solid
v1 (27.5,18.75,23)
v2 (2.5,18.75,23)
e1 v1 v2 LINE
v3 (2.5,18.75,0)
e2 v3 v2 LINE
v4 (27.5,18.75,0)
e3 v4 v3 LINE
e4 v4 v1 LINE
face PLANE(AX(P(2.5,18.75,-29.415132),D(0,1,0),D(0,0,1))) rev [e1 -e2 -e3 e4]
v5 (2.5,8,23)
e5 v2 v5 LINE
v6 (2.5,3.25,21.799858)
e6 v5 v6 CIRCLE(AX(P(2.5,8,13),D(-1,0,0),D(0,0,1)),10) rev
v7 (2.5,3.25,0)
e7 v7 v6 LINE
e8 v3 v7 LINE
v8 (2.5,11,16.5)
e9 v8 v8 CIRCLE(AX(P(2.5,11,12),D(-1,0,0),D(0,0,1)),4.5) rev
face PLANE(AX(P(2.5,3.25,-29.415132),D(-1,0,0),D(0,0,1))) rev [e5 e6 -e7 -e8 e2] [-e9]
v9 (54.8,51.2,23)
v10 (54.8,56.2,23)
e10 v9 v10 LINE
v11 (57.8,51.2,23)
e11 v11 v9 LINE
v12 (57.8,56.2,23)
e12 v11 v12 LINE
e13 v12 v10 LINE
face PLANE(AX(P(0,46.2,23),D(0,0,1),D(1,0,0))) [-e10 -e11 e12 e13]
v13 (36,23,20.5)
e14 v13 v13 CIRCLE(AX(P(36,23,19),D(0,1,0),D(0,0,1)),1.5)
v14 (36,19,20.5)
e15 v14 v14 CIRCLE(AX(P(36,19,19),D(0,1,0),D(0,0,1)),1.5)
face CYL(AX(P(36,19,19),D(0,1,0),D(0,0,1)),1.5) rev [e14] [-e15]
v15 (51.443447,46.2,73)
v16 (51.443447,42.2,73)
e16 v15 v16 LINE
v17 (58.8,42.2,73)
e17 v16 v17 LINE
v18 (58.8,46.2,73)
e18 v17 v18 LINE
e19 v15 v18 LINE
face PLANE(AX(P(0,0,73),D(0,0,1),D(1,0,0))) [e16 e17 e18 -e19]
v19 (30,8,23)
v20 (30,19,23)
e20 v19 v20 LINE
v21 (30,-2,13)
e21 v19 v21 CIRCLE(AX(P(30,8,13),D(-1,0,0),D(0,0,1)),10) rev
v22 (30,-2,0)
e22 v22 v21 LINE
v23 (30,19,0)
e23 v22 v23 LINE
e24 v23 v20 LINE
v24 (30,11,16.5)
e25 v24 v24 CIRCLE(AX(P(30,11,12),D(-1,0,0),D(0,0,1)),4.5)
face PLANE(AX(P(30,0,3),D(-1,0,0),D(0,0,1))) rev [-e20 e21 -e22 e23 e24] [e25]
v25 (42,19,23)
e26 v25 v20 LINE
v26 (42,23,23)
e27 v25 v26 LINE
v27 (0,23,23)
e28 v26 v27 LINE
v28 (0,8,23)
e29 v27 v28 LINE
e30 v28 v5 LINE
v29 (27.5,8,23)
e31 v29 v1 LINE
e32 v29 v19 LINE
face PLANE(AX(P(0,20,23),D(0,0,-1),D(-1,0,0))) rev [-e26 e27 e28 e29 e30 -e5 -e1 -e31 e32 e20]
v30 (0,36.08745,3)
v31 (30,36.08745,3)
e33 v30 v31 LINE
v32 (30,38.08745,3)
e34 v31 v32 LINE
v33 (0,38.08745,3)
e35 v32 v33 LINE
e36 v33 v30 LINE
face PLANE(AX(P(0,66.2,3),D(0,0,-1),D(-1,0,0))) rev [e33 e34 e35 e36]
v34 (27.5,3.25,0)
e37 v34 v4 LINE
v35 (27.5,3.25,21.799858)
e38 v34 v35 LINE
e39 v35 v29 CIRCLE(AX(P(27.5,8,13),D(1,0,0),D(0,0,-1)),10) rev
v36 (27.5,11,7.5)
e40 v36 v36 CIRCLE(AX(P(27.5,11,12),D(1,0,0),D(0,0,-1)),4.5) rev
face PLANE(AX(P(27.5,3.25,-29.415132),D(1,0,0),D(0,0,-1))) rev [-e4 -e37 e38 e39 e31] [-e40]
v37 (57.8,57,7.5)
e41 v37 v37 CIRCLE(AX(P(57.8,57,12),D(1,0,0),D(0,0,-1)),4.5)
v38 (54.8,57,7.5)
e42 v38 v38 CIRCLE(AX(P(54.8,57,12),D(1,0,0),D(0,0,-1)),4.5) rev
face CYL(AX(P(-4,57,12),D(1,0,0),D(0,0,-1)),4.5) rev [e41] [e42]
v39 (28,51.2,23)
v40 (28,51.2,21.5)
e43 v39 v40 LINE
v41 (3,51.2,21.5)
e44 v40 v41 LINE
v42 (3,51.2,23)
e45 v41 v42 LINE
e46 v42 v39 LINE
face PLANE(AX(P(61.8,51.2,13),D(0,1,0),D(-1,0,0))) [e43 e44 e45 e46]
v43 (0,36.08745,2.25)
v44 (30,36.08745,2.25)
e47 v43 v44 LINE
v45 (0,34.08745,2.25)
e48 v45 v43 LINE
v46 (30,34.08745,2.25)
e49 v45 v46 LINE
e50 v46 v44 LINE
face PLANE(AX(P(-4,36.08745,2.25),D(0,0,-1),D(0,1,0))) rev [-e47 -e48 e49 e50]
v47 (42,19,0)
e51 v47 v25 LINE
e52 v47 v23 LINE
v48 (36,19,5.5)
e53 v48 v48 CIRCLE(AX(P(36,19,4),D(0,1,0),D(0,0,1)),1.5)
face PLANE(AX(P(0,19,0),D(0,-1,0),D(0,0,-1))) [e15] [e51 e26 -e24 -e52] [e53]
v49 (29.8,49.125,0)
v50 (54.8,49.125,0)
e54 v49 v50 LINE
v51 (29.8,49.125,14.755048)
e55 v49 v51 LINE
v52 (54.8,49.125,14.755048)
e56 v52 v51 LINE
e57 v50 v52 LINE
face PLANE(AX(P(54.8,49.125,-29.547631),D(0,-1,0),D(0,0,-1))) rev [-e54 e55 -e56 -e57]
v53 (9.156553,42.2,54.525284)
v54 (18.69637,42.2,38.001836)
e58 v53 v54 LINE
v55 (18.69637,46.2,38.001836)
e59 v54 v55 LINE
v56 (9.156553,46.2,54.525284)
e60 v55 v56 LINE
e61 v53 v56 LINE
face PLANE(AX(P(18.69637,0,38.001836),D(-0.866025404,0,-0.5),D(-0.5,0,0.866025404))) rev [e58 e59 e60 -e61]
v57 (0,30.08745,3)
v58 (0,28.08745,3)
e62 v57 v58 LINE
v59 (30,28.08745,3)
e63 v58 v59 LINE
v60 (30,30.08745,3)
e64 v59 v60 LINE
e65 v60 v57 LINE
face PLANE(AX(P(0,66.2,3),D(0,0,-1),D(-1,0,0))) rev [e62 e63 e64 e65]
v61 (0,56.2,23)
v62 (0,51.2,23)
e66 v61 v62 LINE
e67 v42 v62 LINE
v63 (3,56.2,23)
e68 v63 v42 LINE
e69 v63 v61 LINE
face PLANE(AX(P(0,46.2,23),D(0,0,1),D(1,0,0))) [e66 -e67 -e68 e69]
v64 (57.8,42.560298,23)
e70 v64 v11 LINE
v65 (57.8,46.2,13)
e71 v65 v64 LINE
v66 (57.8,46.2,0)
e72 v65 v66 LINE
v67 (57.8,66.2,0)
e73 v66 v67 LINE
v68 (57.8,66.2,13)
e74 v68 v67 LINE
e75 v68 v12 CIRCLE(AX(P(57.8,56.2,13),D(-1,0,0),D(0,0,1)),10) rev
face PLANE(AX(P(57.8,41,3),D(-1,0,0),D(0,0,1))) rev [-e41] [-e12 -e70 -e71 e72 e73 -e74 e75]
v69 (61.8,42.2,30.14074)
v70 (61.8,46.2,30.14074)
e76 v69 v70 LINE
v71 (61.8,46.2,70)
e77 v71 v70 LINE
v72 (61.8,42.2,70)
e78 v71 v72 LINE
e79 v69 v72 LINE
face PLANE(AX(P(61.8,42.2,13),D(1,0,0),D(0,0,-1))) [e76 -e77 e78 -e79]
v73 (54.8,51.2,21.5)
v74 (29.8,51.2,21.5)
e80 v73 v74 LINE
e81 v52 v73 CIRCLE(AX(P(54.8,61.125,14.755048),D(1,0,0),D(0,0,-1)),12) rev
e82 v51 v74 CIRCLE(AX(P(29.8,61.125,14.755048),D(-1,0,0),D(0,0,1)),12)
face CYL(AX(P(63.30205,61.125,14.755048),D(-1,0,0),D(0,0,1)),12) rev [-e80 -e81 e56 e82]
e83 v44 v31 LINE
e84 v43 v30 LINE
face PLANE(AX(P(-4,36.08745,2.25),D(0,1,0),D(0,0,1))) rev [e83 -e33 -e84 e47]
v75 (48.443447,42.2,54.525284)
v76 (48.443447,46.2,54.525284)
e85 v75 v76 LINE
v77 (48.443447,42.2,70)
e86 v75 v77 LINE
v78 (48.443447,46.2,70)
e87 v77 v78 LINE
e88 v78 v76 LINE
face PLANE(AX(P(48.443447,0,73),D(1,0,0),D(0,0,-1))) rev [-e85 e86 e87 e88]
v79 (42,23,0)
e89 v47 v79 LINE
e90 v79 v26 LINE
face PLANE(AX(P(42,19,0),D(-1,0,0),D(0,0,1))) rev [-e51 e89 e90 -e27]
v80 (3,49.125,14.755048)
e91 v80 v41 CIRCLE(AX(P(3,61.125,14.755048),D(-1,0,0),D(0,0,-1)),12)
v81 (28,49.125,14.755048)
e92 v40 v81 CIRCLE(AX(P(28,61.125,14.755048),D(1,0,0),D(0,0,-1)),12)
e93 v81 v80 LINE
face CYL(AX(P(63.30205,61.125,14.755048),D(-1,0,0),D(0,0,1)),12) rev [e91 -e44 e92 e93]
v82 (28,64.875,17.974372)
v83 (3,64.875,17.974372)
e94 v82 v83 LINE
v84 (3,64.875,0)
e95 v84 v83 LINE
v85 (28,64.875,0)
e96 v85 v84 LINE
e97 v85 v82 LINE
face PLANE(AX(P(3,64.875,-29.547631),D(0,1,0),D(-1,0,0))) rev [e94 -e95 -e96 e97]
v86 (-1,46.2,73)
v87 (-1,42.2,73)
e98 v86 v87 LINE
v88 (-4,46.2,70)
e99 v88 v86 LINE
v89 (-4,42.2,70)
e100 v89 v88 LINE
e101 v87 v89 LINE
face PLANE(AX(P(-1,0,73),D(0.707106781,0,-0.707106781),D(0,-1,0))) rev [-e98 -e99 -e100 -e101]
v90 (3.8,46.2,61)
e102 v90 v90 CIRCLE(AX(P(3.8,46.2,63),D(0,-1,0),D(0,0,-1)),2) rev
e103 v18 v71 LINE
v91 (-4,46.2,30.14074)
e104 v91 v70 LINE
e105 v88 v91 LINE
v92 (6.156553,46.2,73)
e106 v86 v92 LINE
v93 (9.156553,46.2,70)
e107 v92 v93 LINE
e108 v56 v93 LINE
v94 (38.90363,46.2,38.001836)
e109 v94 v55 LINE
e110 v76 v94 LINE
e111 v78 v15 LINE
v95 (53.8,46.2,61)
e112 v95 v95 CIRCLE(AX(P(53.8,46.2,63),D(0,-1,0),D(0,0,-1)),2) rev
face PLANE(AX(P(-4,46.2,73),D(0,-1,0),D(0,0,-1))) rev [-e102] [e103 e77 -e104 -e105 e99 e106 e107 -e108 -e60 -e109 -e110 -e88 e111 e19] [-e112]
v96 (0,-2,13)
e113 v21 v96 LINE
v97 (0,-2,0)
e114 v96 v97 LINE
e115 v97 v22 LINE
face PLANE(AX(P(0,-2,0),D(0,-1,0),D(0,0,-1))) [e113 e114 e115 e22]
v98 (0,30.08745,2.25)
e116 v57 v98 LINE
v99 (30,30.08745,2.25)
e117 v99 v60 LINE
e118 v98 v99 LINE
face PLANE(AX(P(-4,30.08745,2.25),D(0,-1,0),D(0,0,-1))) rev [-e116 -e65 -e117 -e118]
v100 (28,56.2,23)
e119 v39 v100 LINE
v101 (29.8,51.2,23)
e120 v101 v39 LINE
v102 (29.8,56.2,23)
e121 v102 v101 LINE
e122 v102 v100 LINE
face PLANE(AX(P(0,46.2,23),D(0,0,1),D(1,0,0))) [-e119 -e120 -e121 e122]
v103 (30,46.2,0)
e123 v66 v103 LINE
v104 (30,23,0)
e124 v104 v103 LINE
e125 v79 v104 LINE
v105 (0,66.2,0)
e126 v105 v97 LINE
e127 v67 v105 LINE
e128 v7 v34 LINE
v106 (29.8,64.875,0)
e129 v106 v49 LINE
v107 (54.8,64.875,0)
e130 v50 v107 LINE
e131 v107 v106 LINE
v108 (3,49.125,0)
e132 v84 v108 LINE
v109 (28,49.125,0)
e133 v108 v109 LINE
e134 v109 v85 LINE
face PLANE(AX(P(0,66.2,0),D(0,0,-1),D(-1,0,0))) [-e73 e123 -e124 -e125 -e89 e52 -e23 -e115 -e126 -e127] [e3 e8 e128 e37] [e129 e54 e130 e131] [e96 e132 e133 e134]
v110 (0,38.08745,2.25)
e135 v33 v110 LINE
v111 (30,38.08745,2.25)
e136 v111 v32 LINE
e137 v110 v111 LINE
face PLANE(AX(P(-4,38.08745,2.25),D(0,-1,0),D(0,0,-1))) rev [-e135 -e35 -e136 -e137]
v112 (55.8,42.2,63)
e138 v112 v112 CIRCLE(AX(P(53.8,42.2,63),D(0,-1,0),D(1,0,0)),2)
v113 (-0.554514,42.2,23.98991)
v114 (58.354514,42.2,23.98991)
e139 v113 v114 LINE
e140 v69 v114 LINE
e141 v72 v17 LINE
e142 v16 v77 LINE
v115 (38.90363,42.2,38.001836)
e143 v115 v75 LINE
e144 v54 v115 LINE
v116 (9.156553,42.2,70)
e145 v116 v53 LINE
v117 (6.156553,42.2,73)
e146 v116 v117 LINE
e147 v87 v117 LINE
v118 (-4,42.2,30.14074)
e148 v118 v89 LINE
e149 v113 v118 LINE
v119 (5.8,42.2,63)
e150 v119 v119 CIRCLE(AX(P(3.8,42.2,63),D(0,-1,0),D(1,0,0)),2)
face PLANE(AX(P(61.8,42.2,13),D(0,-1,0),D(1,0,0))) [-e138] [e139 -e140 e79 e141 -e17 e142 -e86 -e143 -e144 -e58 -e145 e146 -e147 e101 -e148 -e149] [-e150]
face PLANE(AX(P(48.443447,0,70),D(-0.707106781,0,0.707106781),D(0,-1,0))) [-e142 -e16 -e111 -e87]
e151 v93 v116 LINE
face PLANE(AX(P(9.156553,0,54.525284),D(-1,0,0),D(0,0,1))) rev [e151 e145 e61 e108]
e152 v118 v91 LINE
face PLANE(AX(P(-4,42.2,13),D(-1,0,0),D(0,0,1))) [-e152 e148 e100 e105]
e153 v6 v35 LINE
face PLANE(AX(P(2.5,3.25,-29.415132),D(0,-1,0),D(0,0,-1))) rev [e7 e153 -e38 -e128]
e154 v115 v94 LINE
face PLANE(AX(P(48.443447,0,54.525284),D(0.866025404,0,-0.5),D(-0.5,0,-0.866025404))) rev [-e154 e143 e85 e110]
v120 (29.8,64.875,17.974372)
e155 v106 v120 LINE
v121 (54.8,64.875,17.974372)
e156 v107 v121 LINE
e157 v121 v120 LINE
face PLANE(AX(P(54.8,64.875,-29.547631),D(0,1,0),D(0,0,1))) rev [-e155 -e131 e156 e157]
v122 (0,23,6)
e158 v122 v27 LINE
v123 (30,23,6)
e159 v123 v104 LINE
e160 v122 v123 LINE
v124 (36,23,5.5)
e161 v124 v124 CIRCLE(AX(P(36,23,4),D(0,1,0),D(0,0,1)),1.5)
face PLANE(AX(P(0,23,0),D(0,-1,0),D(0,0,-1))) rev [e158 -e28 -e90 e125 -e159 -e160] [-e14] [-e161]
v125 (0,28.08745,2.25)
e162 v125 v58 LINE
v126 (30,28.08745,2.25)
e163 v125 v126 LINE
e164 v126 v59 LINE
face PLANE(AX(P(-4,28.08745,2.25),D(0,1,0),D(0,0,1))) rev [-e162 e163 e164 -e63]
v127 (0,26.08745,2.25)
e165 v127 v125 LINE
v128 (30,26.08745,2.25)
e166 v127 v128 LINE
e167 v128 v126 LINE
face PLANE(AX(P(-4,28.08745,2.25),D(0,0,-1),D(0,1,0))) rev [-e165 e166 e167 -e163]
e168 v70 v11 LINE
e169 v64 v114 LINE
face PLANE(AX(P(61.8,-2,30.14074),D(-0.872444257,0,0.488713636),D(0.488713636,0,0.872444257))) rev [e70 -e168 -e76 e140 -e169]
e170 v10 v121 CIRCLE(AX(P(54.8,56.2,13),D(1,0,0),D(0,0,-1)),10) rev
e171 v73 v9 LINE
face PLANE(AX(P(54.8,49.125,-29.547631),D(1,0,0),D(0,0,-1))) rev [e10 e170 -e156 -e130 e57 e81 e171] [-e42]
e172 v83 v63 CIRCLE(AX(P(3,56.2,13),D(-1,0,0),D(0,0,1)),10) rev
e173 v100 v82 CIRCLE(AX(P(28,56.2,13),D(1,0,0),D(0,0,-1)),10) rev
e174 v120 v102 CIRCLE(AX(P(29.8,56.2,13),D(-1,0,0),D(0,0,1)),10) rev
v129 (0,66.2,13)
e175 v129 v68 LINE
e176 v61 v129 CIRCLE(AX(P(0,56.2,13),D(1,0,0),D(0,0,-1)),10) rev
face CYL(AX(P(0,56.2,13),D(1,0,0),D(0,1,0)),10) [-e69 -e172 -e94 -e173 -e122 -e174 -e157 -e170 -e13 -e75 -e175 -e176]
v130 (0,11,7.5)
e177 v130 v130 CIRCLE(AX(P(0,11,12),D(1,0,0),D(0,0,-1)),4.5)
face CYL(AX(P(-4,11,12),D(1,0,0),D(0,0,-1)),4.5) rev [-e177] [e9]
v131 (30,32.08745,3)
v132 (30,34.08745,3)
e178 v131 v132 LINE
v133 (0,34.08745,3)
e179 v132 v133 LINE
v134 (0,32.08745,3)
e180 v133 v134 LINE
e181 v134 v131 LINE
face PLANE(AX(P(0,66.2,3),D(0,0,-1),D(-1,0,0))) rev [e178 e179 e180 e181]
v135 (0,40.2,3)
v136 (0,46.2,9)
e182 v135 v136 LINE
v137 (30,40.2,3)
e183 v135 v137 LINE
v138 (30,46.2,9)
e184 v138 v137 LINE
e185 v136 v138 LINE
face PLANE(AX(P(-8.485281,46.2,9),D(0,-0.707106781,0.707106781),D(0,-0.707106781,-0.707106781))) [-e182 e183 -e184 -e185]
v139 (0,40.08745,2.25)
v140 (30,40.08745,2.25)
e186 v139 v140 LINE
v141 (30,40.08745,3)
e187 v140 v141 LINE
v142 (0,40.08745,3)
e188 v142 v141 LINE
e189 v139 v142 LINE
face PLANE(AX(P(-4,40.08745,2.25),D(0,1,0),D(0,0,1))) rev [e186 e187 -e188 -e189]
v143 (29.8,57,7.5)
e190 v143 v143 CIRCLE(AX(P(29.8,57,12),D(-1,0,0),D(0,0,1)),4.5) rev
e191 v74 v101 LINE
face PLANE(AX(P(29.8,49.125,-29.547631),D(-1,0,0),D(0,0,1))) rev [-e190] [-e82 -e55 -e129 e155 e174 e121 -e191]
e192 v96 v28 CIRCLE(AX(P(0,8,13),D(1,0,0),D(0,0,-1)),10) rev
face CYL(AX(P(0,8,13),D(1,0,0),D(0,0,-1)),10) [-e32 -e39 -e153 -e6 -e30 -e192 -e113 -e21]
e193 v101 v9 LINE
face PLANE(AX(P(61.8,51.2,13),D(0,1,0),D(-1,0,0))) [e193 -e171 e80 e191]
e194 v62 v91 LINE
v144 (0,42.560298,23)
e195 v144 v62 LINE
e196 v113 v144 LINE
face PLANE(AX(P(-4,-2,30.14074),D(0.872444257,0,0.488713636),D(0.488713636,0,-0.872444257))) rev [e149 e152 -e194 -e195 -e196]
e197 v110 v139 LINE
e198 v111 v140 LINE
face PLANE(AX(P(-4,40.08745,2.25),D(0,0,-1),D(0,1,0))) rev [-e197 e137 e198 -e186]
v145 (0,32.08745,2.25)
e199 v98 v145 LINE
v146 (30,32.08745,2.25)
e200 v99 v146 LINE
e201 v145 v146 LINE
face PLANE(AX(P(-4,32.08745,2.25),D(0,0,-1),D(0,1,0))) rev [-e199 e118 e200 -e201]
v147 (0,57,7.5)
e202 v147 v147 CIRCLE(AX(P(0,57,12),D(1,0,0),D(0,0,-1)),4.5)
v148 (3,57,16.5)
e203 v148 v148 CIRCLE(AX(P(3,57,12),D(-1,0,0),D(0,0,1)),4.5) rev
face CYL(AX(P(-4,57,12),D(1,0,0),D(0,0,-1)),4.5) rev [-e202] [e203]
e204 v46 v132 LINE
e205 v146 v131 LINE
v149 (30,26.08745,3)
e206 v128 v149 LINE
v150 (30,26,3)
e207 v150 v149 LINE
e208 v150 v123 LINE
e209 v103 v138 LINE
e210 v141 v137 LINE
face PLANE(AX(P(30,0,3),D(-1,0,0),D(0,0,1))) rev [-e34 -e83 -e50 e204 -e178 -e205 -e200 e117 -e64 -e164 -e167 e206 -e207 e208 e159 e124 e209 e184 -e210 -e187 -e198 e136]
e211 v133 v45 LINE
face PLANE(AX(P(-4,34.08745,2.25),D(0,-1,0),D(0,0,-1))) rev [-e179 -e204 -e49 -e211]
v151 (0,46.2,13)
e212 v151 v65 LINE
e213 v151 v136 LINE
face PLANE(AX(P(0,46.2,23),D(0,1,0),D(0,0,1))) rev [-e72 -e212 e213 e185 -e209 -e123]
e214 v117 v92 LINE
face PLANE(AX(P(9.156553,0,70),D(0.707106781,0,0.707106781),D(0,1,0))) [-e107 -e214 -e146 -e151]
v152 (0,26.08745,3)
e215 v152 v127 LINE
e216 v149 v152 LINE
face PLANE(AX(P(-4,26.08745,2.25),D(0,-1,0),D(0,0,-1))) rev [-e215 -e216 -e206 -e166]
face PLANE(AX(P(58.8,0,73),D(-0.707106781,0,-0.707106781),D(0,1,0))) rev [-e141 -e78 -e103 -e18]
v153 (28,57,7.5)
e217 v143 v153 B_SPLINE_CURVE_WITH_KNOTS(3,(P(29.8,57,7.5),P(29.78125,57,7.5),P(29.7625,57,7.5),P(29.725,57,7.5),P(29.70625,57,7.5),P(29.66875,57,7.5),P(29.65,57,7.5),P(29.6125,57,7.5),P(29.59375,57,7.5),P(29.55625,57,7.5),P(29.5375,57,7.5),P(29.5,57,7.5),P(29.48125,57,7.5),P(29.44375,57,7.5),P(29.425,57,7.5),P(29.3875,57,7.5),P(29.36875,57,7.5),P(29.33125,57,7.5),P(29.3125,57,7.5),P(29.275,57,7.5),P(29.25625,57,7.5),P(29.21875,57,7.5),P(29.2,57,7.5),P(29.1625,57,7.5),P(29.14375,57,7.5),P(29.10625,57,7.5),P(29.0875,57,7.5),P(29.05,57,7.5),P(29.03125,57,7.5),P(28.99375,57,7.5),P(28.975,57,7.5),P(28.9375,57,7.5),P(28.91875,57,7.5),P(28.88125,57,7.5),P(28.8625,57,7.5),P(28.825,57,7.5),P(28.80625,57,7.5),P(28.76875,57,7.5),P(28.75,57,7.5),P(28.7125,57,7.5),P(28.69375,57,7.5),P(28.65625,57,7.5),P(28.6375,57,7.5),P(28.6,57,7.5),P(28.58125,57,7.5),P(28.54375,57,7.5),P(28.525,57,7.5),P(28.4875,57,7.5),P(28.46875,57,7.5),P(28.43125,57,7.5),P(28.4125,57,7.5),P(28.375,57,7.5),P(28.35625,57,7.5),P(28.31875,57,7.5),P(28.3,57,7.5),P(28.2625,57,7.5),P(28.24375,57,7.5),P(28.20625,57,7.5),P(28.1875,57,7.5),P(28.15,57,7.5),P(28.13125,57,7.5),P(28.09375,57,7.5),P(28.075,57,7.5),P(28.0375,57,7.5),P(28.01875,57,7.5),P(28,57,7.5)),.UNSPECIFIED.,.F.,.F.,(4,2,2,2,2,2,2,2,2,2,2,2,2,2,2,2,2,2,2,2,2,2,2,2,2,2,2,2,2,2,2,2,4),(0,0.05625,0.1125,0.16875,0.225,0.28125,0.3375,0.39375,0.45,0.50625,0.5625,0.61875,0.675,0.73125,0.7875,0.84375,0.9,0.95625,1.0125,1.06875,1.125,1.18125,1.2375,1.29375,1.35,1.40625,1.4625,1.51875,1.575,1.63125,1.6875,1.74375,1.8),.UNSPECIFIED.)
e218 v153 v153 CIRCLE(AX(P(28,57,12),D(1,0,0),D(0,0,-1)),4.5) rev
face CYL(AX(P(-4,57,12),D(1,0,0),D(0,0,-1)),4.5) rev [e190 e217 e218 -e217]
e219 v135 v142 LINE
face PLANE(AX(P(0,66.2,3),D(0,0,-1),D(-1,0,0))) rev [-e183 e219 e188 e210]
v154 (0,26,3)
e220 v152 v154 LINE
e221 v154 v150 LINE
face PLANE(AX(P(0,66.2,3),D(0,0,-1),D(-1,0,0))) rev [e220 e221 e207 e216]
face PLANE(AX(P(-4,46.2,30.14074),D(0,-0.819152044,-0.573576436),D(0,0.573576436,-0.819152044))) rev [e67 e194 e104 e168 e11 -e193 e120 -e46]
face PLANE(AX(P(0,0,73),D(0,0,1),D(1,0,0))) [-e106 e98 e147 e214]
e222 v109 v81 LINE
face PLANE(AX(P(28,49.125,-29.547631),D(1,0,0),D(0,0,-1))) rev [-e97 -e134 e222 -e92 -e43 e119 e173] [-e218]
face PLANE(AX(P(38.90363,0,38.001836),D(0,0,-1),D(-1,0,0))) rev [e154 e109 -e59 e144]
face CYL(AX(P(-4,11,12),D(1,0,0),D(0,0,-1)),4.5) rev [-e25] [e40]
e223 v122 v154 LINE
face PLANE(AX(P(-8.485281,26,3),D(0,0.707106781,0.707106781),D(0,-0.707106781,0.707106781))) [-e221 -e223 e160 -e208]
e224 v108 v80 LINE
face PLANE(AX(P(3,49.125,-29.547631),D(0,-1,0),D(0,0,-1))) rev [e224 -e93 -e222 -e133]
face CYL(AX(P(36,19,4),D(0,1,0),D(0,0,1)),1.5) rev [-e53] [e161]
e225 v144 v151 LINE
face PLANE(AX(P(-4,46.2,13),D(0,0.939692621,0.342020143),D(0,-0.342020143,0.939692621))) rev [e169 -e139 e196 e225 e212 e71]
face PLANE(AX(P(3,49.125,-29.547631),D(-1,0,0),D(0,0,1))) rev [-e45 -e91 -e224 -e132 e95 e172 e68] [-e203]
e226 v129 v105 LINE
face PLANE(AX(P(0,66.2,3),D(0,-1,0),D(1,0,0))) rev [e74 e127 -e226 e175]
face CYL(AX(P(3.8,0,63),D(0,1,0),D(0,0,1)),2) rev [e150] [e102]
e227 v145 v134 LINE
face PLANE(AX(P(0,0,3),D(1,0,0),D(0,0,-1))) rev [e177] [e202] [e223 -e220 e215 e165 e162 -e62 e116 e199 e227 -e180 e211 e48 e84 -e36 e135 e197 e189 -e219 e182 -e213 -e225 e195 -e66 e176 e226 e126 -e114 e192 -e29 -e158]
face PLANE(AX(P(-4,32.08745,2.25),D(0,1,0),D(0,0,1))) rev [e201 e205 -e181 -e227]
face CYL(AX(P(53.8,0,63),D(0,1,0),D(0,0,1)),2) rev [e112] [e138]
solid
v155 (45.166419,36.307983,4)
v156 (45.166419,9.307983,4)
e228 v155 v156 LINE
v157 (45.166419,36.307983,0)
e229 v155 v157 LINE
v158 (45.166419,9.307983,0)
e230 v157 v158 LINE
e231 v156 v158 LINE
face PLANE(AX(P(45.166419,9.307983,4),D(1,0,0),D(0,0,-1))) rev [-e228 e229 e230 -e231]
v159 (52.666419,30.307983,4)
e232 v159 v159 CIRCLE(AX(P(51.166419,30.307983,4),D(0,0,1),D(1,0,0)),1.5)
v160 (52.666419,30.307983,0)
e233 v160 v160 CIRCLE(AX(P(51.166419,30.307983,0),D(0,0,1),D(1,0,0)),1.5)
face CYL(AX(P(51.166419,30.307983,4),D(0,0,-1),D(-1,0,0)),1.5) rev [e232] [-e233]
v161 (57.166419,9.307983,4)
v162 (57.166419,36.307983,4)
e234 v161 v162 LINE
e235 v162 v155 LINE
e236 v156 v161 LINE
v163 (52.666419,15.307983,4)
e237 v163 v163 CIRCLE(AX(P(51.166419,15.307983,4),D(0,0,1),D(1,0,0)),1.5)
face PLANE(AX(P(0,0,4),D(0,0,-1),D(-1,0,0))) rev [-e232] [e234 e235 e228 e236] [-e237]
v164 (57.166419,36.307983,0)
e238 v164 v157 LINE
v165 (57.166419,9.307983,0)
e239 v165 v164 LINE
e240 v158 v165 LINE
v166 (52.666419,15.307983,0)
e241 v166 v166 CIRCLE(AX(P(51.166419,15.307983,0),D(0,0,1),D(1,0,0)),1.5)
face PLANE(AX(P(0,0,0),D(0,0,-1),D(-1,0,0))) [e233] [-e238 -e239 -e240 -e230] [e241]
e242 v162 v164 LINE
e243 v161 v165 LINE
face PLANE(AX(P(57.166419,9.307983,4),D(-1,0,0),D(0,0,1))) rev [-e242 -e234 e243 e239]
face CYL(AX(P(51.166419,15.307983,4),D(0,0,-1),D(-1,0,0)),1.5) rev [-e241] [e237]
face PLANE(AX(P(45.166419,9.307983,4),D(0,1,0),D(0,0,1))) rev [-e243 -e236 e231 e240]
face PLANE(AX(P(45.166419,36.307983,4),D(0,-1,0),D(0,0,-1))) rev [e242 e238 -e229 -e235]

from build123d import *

# Parameters (mm, degrees)
SALIENTE_EXTRUIR3_DEPTH       = 3
CROQUIS6_W                    = 30
CROQUIS6_H                    = 20
CROQUIS6_W_2                  = 57.8
SALIENTE_EXTRUIR4_DEPTH       = 20
SALIENTE_EXTRUIR9_DEPTH       = 50
SALIENTE_EXTRUIR9_DEPTH_BACK  = 10
CROQUIS22_W                   = 65.8
CROQUIS22_H                   = 9
CROQUIS9_R                    = 4.5
CORTAR_EXTRUIR1_DEPTH         = 117.32145116
CROQUIS17_W                   = 25
CROQUIS17_H                   = 15.5
CORTAR_EXTRUIR6_DEPTH         = 23
CROQUIS18_W                   = 25
CROQUIS18_H                   = 15.75
CORTAR_EXTRUIR7_DEPTH         = 23
CROQUIS14_R                   = 2
CORTAR_EXTRUIR4_DEPTH         = 117.32145116
CROQUIS16_W                   = 3.75
CROQUIS16_H                   = 2
CORTAR_EXTRUIR5_DEPTH         = 105.247014346
SALIENTE_EXTRUIR10_DEPTH      = 51.8
CROQUIS24_W                   = 13.9
CROQUIS24_H                   = 5.2
CROQUIS24_W_2                 = 27.8
CORTAR_EXTRUIR9_DEPTH         = 115.462570301
REDONDEO1_R                   = 10
SALIENTE_EXTRUIR12_DEPTH      = 30
CROQUIS29_W                   = 30
CROQUIS29_H                   = 23
SALIENTE_EXTRUIR13_DEPTH      = 2
REDONDEO2_R                   = 10
CORTAR_EXTRUIR10_DEPTH        = 119.495063188
CHAFL_N1_SIZE                 = 3
CORTAR_EXTRUIR11_DEPTH        = 110.446242512
SALIENTE_EXTRUIR14_DEPTH      = 3
SALIENTE_EXTRUIR14_DEPTH_BACK = 1
CROQUIS12_R                   = 1.5
CROQUIS33_W                   = 12
CROQUIS33_H                   = 27
CROQUIS33_R                   = 1.5
SALIENTE_EXTRUIR15_DEPTH      = 4


with BuildPart() as part:
    # Croquis2 → Saliente-Extruir3 (new body)
    with BuildSketch(Plane.XY):
        Polygon((30, 41), (57.8, 41), (57.8, 66.2), (0, 66.2), (0, 0), (30, 0), align=None)
    extrude(amount=SALIENTE_EXTRUIR3_DEPTH)

    # Croquis6 → Saliente-Extruir4 (add)
    with BuildSketch(Plane.XY.offset(3)):
        with Locations((15, 10)):
            Rectangle(CROQUIS6_W, CROQUIS6_H)
        with Locations((28.9, 56.2)):
            Rectangle(CROQUIS6_W_2, CROQUIS6_H)
    extrude(amount=SALIENTE_EXTRUIR4_DEPTH)

    # Croquis22 → Saliente-Extruir9 (add, two sides: drawn at the far end of the back side and taken through both)
    with BuildSketch(Plane.XY.offset(23).offset(-SALIENTE_EXTRUIR9_DEPTH_BACK)):
        with Locations((28.9, 46.7)):
            Rectangle(CROQUIS22_W, CROQUIS22_H)
    extrude(amount=SALIENTE_EXTRUIR9_DEPTH + SALIENTE_EXTRUIR9_DEPTH_BACK)

    # Croquis9 → Cortar-Extruir1 (cut, through all)
    with BuildSketch(Plane(origin=(57.8, 0, 0), x_dir=(0, 0, -1), z_dir=(1, 0, 0))):
        with Locations((-12, 57)):
            Circle(CROQUIS9_R)
        with Locations((-12, 11)):
            Circle(CROQUIS9_R)
    extrude(amount=-CORTAR_EXTRUIR1_DEPTH, mode=Mode.SUBTRACT)

    # Croquis17 → Cortar-Extruir6 (cut)
    with BuildSketch(Plane.XY.offset(23)):
        with Locations((15, 11)):
            Rectangle(CROQUIS17_W, CROQUIS17_H)
    extrude(amount=-CORTAR_EXTRUIR6_DEPTH, mode=Mode.SUBTRACT)

    # Croquis18 → Cortar-Extruir7 (cut)
    with BuildSketch(Plane.XY.offset(23)):
        with Locations((15.5, 57)):
            Rectangle(CROQUIS18_W, CROQUIS18_H)
        with Locations((42.3, 57)):
            Rectangle(CROQUIS18_W, CROQUIS18_H)
    extrude(amount=-CORTAR_EXTRUIR7_DEPTH, mode=Mode.SUBTRACT)

    # Croquis14 → Cortar-Extruir4 (cut, through all)
    with BuildSketch(Plane(origin=(0, 66.2, 0), x_dir=(1, 0, 0), z_dir=(0, 1, 0))):
        with Locations(Location((3.8, -63, 0), (0, 0, 180))):
            Circle(CROQUIS14_R)
        with Locations(Location((53.8, -63, 0), (0, 0, 180))):
            Circle(CROQUIS14_R)
        Polygon((9.156552599, -54.525284491), (9.156552599, -73), (48.443447401, -73), (48.443447401, -54.525284491), (38.903629711, -38.001835556), (18.696370289, -38.001835556), align=None)
    extrude(amount=-CORTAR_EXTRUIR4_DEPTH, mode=Mode.SUBTRACT)

    # Croquis16 → Cortar-Extruir5 (cut, through all)
    with BuildSketch(Plane(origin=(30, 0, 0), x_dir=(0, 0, -1), z_dir=(1, 0, 0))):
        with Locations((-4.125, 35.087449781)):
            Rectangle(CROQUIS16_W, CROQUIS16_H)
        with Locations((-4.125, 39.087449781)):
            Rectangle(CROQUIS16_W, CROQUIS16_H)
        with Locations((-4.125, 31.087449781)):
            Rectangle(CROQUIS16_W, CROQUIS16_H)
        with Locations((-4.125, 27.087449781)):
            Rectangle(CROQUIS16_W, CROQUIS16_H)
    extrude(amount=-CORTAR_EXTRUIR5_DEPTH, mode=Mode.SUBTRACT)

    # Croquis23 → Saliente-Extruir10 (add)
    with BuildSketch(Plane(origin=(3, 0, 0), x_dir=(0, 0, -1), z_dir=(1, 0, 0))):
        with BuildLine():
            Line((-23, 49.125), (-14.755048184, 49.125))
            ThreePointArc((-14.755048184, 49.125), (-18.283503937, 49.655475162), (-21.5, 51.2))
            Line((-21.5, 51.2), (-23, 51.2))
            Line((-23, 51.2), (-23, 49.125))
        make_face()
    extrude(amount=SALIENTE_EXTRUIR10_DEPTH)

    # Croquis24 → Cortar-Extruir9 (cut, through all)
    with BuildSketch(Plane.XY.offset(3)):
        with Locations((-6.95, 43.6)):
            Rectangle(CROQUIS24_W, CROQUIS24_H)
        with Locations((43.9, 43.6)):
            Rectangle(CROQUIS24_W_2, CROQUIS24_H)
    extrude(amount=-CORTAR_EXTRUIR9_DEPTH, mode=Mode.SUBTRACT)

    # Redondeo1
    # the kernel refuses this fillet: 10 mm, written as the material it takes off along each edge
    with BuildSketch(Plane(origin=(-25, 66.2, 23), x_dir=(0, -1, 0), z_dir=(1, 0, 0))) as redondeo1_piece_1:
        with BuildLine():
            CenterArc((REDONDEO1_R, REDONDEO1_R), REDONDEO1_R, 180, 90)
            Line((0, REDONDEO1_R), (0, 0))
            Line((0, 0), (REDONDEO1_R, 0))
        make_face()
    extrude(amount=107.8, mode=Mode.SUBTRACT)

    # Croquis28 → Saliente-Extruir12 (add)
    with BuildSketch(Plane(origin=(30, 0, 0), x_dir=(0, 0, -1), z_dir=(1, 0, 0))):
        Polygon((-9, 46.2), (-3, 40.2), (-3, 46.2), align=None)
        Polygon((-3, 26), (-6, 23), (-3, 23), align=None)
    extrude(amount=-SALIENTE_EXTRUIR12_DEPTH)

    # Croquis29 → Saliente-Extruir13 (add)
    with BuildSketch(Plane.XZ):
        with Locations((15, 11.5)):
            Rectangle(CROQUIS29_W, CROQUIS29_H)
    extrude(amount=SALIENTE_EXTRUIR13_DEPTH)

    # Redondeo2
    # the kernel refuses this fillet: 10 mm, written as the material it takes off along each edge
    with BuildSketch(Plane(origin=(55, -2, 23), x_dir=(0, 0, -1), z_dir=(-1, 0, 0))) as redondeo2_piece_1:
        with BuildLine():
            CenterArc((REDONDEO2_R, -REDONDEO2_R), REDONDEO2_R, 90, 90)
            Line((0, -REDONDEO2_R), (0, 0))
            Line((0, 0), (REDONDEO2_R, 0))
        make_face()
    extrude(amount=80, mode=Mode.SUBTRACT)

    # Croquis31 → Cortar-Extruir10 (cut, through all)
    with BuildSketch(Plane(origin=(61.8, 0, 0), x_dir=(0, 0, -1), z_dir=(1, 0, 0))):
        Polygon((-73, 46.2), (-30.140740034, 46.2), (-23, 51.2), (-73, 51.2), align=None)
        Polygon((-13, 46.2), (-23.989909678, 42.2), (-13, 42.2), align=None)
    extrude(amount=-CORTAR_EXTRUIR10_DEPTH, mode=Mode.SUBTRACT)

    # Chaflán1
    chafl_n1_edges = [part.edges().sort_by_distance(p)[0] for p in [
        (48.443447401, 44.2, 73),
        (9.156552599, 44.2, 73),
        (-4, 44.2, 73),
        (61.8, 44.2, 73),
    ]]
    chamfer(chafl_n1_edges, length=CHAFL_N1_SIZE)

    # Croquis32 → Cortar-Extruir11 (cut, through all)
    with BuildSketch(Plane(origin=(0, 51.2, 0), x_dir=(1, 0, 0), z_dir=(0, 1, 0))):
        Polygon((0, -13), (-4, -13), (-4, -30.140740034), (0, -23), align=None)
        Polygon((57.8, -13), (61.8, -13), (61.8, -30.140740034), (57.8, -23), align=None)
    extrude(amount=-CORTAR_EXTRUIR11_DEPTH, mode=Mode.SUBTRACT)

    # Croquis12 → Saliente-Extruir14 (add, two sides: drawn at the far end of the back side and taken through both)
    with BuildSketch(Plane(origin=(0, 20, 0), x_dir=(1, 0, 0), z_dir=(0, 1, 0)).offset(-SALIENTE_EXTRUIR14_DEPTH_BACK)):
        Polygon((30, 0), (30, -3), (0, -3), (0, -23), (42, -23), (42, 0), align=None)
        with Locations(Location((36, -19, 0), (0, 0, 270))):
            Circle(CROQUIS12_R, mode=Mode.SUBTRACT)
        with Locations(Location((36, -4, 0), (0, 0, 270))):
            Circle(CROQUIS12_R, mode=Mode.SUBTRACT)
    extrude(amount=SALIENTE_EXTRUIR14_DEPTH + SALIENTE_EXTRUIR14_DEPTH_BACK)


with BuildPart() as body_2:
    # Croquis33 → Saliente-Extruir15 (new body)
    with BuildSketch(Plane.XY):
        with Locations((51.166419269, 22.8079829)):
            Rectangle(CROQUIS33_W, CROQUIS33_H)
        with Locations((51.166419269, 30.3079829)):
            Circle(CROQUIS33_R, mode=Mode.SUBTRACT)
        with Locations((51.166419269, 15.3079829)):
            Circle(CROQUIS33_R, mode=Mode.SUBTRACT)
    extrude(amount=SALIENTE_EXTRUIR15_DEPTH)


solid = Compound([part.part, body_2.part])
